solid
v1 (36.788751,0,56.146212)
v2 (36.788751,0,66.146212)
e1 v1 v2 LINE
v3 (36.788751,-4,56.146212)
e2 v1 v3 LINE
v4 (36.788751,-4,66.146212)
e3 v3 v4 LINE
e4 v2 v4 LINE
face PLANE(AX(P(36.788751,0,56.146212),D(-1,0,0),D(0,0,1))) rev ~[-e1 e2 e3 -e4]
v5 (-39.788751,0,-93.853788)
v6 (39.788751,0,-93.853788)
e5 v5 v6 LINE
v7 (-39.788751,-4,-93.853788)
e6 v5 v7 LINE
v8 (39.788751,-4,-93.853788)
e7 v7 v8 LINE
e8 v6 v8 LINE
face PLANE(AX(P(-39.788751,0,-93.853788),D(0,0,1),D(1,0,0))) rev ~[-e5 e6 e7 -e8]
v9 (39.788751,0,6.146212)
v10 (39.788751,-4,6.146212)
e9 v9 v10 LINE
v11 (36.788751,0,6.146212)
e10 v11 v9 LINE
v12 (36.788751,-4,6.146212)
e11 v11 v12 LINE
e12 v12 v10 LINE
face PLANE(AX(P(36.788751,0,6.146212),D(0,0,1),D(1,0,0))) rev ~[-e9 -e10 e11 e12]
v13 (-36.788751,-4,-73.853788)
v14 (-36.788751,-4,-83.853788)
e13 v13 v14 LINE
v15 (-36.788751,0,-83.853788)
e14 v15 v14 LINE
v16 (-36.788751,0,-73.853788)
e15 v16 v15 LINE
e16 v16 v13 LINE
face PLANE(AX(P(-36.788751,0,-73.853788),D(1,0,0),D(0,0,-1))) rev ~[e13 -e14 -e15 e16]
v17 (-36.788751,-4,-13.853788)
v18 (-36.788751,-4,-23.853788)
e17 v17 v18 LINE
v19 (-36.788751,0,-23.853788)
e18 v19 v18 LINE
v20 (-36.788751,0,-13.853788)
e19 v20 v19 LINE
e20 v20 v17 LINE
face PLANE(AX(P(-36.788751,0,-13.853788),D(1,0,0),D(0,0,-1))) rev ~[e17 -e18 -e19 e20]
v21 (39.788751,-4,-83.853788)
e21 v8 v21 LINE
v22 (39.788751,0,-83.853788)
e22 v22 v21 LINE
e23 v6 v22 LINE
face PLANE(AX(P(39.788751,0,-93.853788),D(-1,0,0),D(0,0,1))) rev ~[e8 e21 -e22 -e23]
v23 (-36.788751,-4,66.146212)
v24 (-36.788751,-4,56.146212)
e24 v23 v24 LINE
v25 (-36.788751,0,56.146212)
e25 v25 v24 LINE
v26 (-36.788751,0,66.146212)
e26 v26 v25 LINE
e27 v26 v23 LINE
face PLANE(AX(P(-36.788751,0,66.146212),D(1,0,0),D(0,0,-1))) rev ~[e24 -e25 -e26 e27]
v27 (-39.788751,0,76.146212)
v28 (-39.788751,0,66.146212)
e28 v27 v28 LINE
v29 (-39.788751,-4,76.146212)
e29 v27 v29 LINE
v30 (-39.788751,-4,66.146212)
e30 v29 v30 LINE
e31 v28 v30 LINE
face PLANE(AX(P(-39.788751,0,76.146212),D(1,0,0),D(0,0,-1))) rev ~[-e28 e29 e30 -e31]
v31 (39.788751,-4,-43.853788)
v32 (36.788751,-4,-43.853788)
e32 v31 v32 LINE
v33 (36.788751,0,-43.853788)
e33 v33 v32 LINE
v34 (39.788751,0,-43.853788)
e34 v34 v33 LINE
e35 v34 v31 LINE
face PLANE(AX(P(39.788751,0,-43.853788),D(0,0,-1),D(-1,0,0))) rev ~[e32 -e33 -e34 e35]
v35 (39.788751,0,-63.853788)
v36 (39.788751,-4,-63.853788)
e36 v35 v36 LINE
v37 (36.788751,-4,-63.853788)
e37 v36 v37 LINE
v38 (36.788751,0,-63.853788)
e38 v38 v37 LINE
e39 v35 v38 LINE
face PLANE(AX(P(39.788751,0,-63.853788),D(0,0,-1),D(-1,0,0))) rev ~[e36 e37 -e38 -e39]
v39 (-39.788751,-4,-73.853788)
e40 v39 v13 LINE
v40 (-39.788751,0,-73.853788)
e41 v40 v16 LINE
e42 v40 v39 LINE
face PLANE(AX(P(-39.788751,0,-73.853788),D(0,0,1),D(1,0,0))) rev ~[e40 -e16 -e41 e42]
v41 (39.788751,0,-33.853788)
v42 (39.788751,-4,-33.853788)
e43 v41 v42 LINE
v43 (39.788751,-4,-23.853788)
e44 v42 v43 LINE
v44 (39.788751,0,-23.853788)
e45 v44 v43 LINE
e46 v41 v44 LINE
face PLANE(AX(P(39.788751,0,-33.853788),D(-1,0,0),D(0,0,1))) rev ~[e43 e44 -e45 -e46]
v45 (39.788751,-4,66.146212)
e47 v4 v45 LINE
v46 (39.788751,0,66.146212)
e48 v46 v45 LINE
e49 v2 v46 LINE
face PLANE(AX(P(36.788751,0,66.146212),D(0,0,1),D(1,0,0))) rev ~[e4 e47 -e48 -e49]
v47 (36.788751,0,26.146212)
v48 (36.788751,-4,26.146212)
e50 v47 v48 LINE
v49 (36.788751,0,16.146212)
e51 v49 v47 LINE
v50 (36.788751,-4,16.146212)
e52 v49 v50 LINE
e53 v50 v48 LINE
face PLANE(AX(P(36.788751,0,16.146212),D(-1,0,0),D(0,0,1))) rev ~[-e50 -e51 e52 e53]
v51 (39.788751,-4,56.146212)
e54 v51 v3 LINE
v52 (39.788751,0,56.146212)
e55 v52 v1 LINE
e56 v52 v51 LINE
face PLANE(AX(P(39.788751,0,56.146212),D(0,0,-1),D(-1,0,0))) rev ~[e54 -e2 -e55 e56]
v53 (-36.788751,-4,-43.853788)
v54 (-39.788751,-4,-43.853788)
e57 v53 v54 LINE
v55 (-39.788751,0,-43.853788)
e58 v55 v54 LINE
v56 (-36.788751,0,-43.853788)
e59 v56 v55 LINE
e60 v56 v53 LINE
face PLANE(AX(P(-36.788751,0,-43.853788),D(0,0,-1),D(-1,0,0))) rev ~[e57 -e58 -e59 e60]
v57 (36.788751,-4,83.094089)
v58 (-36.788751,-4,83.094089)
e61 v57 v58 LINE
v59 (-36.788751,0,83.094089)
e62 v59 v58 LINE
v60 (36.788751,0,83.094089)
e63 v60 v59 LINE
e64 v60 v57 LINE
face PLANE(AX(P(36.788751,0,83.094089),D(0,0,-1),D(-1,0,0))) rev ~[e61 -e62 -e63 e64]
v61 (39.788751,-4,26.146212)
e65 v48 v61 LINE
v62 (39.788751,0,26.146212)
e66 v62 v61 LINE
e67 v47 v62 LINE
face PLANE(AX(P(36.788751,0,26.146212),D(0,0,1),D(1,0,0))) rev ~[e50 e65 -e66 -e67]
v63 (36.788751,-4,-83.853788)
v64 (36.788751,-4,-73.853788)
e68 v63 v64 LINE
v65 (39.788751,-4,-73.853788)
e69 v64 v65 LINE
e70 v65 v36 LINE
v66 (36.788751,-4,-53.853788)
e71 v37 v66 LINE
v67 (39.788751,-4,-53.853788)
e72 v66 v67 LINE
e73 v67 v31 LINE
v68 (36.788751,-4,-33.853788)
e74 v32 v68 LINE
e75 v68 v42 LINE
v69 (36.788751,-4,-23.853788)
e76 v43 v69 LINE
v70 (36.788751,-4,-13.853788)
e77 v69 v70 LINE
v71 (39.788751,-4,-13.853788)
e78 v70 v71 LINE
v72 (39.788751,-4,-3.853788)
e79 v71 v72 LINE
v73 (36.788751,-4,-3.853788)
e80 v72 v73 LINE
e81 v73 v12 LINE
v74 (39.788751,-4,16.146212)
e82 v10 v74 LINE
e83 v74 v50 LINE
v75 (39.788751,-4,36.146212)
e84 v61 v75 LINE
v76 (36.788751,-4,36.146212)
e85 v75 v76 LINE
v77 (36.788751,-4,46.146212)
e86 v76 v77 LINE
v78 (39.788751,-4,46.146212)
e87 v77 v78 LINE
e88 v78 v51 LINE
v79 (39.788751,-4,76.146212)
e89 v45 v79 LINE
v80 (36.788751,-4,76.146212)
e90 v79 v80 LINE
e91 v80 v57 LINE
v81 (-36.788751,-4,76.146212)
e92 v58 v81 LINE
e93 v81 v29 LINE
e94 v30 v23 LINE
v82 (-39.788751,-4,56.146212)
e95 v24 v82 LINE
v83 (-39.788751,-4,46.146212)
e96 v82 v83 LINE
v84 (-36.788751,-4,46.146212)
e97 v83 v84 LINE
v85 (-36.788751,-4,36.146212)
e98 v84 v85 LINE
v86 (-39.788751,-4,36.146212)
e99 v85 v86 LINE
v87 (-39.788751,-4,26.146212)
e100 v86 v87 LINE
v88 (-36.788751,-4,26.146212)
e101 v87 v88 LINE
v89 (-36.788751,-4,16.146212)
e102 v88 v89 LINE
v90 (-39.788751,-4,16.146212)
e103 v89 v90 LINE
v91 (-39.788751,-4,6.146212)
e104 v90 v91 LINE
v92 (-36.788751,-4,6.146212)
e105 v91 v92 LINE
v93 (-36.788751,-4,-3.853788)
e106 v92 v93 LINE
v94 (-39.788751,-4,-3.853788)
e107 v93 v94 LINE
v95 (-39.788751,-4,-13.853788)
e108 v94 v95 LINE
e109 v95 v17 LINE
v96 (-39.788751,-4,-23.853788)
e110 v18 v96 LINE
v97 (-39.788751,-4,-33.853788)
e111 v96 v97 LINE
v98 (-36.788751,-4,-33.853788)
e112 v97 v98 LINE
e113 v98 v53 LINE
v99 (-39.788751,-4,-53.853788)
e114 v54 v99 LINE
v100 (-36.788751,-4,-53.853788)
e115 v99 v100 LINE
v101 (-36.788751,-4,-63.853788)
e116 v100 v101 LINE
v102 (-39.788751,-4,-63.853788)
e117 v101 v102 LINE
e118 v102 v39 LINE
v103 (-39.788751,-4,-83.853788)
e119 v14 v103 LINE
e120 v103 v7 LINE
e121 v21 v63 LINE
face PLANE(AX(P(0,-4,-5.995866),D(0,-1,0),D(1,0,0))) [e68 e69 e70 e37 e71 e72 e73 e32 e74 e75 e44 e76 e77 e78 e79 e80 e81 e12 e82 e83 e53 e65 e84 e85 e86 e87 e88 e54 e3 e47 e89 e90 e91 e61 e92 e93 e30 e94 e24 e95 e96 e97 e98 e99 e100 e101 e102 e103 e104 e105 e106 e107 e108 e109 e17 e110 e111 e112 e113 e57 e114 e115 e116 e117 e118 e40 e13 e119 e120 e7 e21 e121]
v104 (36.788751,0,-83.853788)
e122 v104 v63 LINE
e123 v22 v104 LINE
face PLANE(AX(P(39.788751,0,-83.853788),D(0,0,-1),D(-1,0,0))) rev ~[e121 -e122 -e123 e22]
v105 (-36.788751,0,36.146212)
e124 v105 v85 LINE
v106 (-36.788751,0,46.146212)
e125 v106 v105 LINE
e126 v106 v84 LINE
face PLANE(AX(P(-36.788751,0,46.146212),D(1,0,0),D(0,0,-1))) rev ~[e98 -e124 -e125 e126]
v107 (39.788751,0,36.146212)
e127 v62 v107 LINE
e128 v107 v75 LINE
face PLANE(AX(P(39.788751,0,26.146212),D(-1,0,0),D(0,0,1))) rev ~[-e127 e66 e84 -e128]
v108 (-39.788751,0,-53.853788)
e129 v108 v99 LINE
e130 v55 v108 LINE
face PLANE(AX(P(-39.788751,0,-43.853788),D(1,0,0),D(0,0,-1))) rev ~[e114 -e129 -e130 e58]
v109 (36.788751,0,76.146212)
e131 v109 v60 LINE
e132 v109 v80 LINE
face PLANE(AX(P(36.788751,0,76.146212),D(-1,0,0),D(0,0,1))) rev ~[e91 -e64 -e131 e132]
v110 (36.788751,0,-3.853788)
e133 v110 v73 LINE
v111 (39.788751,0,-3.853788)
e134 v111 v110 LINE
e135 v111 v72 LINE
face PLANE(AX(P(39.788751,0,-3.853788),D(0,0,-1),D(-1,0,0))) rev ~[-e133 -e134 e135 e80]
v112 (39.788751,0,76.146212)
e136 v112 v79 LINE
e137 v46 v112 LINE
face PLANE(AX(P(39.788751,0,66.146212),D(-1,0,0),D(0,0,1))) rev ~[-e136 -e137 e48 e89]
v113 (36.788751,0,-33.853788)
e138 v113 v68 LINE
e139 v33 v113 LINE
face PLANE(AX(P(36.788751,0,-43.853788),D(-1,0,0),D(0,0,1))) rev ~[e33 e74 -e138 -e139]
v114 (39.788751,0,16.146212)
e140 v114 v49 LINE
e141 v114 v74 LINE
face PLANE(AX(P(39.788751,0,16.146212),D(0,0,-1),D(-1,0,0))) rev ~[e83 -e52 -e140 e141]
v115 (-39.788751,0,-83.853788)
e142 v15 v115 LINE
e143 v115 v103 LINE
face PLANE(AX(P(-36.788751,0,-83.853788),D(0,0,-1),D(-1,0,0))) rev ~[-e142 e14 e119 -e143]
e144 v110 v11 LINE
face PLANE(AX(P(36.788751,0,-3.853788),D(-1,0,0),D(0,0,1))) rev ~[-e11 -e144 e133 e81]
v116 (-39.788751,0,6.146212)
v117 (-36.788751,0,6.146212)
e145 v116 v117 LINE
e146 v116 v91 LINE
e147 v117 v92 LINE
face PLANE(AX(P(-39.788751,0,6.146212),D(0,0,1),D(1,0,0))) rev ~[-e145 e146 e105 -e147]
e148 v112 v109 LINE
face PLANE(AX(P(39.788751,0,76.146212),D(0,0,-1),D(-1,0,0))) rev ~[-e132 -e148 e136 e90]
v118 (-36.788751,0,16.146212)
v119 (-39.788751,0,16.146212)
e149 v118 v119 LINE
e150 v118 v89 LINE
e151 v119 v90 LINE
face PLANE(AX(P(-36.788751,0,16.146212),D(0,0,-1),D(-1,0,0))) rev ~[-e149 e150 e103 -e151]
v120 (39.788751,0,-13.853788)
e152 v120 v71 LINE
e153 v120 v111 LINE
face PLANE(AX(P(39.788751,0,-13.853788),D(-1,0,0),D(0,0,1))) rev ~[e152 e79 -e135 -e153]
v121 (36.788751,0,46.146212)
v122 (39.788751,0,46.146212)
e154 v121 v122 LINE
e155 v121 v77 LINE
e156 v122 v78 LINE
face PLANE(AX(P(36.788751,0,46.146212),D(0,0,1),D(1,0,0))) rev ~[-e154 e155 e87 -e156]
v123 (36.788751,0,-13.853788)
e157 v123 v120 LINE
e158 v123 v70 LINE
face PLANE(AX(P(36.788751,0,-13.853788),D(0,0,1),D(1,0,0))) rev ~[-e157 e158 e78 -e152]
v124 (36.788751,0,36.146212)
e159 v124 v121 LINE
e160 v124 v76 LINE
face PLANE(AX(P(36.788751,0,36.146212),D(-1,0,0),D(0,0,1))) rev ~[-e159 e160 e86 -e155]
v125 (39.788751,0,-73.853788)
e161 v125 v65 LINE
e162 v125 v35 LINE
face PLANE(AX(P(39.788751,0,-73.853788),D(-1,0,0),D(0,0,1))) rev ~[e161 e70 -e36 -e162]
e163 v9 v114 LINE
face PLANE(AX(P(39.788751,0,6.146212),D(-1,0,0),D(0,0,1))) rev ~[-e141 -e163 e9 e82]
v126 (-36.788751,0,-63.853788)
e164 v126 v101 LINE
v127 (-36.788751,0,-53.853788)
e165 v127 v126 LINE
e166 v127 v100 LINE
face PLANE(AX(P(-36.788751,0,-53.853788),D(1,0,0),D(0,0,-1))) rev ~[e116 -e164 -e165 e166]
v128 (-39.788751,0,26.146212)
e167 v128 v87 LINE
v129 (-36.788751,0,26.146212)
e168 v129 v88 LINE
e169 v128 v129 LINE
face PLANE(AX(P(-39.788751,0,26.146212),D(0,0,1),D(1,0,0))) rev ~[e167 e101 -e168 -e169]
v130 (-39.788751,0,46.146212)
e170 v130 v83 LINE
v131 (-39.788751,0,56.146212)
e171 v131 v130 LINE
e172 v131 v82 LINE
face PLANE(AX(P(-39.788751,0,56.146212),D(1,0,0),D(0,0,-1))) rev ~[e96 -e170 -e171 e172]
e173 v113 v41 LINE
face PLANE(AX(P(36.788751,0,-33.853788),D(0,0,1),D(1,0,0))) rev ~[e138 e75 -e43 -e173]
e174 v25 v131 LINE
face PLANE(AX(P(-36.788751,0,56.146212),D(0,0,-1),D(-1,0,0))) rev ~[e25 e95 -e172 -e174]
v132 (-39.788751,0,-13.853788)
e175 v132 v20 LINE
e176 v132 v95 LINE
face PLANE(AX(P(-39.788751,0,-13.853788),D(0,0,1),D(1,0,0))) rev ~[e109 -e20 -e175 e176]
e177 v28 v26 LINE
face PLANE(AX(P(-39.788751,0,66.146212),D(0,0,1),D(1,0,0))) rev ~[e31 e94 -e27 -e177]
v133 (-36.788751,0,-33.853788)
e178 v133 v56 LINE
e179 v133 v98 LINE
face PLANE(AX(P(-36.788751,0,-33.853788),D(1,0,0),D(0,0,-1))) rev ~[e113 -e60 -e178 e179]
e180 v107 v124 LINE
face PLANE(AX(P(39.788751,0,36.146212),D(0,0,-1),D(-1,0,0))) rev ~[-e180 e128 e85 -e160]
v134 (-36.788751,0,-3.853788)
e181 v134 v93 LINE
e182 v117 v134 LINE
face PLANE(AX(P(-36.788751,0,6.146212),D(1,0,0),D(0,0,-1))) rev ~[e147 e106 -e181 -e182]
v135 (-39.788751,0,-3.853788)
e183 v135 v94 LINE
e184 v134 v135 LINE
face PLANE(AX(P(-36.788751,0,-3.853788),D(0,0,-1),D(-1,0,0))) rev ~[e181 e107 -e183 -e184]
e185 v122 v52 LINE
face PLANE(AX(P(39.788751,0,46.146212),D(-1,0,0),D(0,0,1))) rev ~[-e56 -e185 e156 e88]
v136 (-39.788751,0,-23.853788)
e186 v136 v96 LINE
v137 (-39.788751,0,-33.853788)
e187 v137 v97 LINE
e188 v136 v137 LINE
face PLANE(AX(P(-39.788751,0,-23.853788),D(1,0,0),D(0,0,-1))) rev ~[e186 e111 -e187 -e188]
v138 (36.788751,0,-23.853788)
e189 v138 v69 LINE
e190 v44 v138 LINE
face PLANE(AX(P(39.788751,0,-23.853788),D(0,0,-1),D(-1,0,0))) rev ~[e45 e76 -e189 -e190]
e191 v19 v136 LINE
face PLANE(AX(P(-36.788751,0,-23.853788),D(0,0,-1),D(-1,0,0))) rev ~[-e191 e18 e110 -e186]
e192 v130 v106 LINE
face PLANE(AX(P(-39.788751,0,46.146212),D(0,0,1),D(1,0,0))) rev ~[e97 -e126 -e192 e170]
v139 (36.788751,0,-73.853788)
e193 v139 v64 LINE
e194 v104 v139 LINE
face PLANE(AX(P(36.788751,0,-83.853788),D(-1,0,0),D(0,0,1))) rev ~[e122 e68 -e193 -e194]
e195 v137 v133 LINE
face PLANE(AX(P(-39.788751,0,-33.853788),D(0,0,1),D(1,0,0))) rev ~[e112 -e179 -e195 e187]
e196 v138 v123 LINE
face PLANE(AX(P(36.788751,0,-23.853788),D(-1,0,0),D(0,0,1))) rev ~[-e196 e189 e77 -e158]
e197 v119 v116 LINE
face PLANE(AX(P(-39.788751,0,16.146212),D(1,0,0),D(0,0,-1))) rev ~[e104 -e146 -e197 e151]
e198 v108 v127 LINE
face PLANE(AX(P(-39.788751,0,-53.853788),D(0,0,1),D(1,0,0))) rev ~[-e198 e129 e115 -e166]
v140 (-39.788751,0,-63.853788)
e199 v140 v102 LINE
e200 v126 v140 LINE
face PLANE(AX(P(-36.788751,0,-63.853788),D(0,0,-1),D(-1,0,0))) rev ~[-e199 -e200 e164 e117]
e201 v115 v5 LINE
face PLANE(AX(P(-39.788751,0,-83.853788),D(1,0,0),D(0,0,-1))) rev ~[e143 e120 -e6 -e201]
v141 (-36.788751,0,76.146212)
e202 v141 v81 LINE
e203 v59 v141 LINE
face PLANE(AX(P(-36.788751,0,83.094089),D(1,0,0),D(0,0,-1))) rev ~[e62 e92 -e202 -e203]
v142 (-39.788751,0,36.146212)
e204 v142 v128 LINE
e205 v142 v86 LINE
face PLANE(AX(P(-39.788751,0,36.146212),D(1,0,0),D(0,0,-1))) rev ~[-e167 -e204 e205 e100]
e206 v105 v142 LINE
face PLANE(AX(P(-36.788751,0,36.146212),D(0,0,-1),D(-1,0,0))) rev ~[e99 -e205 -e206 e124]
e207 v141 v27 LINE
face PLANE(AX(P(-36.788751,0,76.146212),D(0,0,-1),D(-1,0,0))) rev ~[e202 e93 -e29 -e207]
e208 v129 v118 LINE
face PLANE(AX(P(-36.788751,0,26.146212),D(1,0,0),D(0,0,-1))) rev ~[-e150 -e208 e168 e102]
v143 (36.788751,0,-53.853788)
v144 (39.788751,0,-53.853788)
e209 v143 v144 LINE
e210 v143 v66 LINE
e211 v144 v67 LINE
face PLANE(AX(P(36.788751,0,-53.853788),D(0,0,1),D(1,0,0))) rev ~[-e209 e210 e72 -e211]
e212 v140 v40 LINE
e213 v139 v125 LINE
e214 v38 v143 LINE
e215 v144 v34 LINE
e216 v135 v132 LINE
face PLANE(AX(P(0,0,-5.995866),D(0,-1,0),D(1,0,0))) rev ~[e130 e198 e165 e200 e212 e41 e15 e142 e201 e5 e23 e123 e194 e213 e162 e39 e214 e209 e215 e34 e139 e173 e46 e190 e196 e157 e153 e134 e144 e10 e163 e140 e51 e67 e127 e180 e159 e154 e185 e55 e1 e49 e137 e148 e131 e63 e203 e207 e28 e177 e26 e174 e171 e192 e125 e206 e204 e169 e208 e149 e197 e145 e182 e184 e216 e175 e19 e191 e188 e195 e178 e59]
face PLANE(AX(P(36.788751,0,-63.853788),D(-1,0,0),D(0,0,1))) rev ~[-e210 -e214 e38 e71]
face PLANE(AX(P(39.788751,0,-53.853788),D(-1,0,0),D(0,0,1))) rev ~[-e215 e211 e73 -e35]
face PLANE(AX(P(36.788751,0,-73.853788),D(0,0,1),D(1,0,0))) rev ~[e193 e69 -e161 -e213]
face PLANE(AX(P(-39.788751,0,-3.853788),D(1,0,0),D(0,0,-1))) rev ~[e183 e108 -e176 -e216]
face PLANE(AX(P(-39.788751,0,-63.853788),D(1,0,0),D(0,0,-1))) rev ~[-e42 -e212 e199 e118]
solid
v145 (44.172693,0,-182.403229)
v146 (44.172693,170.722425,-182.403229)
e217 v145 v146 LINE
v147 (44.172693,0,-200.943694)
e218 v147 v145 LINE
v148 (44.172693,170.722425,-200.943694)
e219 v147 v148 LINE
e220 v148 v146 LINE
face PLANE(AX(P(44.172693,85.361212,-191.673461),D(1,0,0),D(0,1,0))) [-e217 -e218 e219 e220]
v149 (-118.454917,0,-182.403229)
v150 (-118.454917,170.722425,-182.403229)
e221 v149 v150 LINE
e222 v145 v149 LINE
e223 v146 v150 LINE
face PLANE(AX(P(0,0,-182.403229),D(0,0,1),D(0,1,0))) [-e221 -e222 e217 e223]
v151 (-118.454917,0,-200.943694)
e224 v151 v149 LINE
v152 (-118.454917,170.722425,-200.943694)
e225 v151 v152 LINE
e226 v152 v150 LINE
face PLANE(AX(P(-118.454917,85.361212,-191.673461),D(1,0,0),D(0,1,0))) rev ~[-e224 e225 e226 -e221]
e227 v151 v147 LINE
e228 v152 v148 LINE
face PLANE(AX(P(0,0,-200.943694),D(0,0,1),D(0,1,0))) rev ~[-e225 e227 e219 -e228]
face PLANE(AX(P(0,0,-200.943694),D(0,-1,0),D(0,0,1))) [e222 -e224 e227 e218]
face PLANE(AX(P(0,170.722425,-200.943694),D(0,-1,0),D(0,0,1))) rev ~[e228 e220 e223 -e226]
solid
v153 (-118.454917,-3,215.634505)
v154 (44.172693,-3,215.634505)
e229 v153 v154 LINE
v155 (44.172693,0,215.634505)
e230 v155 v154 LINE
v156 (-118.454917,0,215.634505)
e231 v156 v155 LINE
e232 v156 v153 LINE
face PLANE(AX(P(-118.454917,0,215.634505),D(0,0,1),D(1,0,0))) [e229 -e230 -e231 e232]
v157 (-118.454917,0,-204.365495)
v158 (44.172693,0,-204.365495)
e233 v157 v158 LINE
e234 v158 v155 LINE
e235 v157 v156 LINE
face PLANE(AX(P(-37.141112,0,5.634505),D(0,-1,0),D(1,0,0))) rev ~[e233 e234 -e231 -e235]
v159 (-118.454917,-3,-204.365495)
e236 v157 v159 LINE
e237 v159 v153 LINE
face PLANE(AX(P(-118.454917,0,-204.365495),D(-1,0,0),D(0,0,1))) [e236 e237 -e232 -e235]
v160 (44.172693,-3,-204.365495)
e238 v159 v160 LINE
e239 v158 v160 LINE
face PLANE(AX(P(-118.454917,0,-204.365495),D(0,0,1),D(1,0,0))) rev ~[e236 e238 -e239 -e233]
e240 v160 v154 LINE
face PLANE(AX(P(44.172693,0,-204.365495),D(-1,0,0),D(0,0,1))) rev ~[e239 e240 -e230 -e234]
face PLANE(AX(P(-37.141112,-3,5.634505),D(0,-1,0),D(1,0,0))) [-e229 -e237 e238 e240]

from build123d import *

# Parameters (mm, degrees)
F0_W     = 162.62761
F0_H     = 420
F1_DEPTH = 3
F2_W     = 170.722424984
F2_H     = 18.5404643416
F3_DEPTH = 118.454916951
F4_DEPTH = 44.172693049
F6_DEPTH = 4


# Not quite as in the source:
# - a feature of the source that left no trace in its solid (it failed there, or was rolled back) is left out


with BuildPart() as f1:
    # F0 (on Front) → F1 (new body)
    with BuildSketch(Plane.XZ):
        with Locations((-37.141111951, 5.6345053017)):
            Rectangle(F0_W, F0_H)
    extrude(amount=F1_DEPTH)


with BuildPart() as f3:
    # F2 (on Right) → F3 (new body, through all)
    with BuildSketch(Plane.YZ):
        with Locations((85.361212492, -191.6734613478)):
            Rectangle(F2_W, F2_H)
    extrude(amount=-F3_DEPTH)

    # F4 (add, through all): a face of the model
    f4_faces = [f3.faces().sort_by_distance(p)[0] for p in [
        (0, 85.361212492, -191.6734613478),
    ]]
    extrude(f4_faces, amount=F4_DEPTH)


with BuildPart() as f6:
    # F5 (on Front) → F6 (new body)
    with BuildSketch(Plane.XZ):
        Polygon((-39.788750782, -83.8537883393), (-39.788750782, -93.8537883393), (39.788750782, -93.8537883393), (39.788750782, -83.8537883393), (36.788750782, -83.8537883393), (36.788750782, -73.8537883393), (39.788750782, -73.8537883393), (39.788750782, -63.8537883393), (36.788750782, -63.8537883393), (36.788750782, -53.8537883393), (39.788750782, -53.8537883393), (39.788750782, -43.8537883393), (36.788750782, -43.8537883393), (36.788750782, -33.8537883393), (39.788750782, -33.8537883393), (39.788750782, -23.8537883393), (36.788750782, -23.8537883393), (36.788750782, -13.8537883393), (39.788750782, -13.8537883393), (39.788750782, -3.8537883393), (36.788750782, -3.8537883393), (36.788750782, 6.1462116607), (39.788750782, 6.1462116607), (39.788750782, 16.1462116607), (36.788750782, 16.1462116607), (36.788750782, 26.1462116607), (39.788750782, 26.1462116607), (39.788750782, 36.1462116607), (36.788750782, 36.1462116607), (36.788750782, 46.1462116607), (39.788750782, 46.1462116607), (39.788750782, 56.1462116607), (36.788750782, 56.1462116607), (36.788750782, 66.1462116607), (39.788750782, 66.1462116607), (39.788750782, 76.1462116607), (36.788750782, 76.1462116607), (36.788750782, 83.0940887698), (-36.788750782, 83.0940887698), (-36.788750782, 76.1462116607), (-39.788750782, 76.1462116607), (-39.788750782, 66.1462116607), (-36.788750782, 66.1462116607), (-36.788750782, 56.1462116607), (-39.788750782, 56.1462116607), (-39.788750782, 46.1462116607), (-36.788750782, 46.1462116607), (-36.788750782, 36.1462116607), (-39.788750782, 36.1462116607), (-39.788750782, 26.1462116607), (-36.788750782, 26.1462116607), (-36.788750782, 16.1462116607), (-39.788750782, 16.1462116607), (-39.788750782, 6.1462116607), (-36.788750782, 6.1462116607), (-36.788750782, -3.8537883393), (-39.788750782, -3.8537883393), (-39.788750782, -13.8537883393), (-36.788750782, -13.8537883393), (-36.788750782, -23.8537883393), (-39.788750782, -23.8537883393), (-39.788750782, -33.8537883393), (-36.788750782, -33.8537883393), (-36.788750782, -43.8537883393), (-39.788750782, -43.8537883393), (-39.788750782, -53.8537883393), (-36.788750782, -53.8537883393), (-36.788750782, -63.8537883393), (-39.788750782, -63.8537883393), (-39.788750782, -73.8537883393), (-36.788750782, -73.8537883393), (-36.788750782, -83.8537883393), align=None)
    extrude(amount=F6_DEPTH)


solid = Compound([f1.part, f3.part, f6.part])
